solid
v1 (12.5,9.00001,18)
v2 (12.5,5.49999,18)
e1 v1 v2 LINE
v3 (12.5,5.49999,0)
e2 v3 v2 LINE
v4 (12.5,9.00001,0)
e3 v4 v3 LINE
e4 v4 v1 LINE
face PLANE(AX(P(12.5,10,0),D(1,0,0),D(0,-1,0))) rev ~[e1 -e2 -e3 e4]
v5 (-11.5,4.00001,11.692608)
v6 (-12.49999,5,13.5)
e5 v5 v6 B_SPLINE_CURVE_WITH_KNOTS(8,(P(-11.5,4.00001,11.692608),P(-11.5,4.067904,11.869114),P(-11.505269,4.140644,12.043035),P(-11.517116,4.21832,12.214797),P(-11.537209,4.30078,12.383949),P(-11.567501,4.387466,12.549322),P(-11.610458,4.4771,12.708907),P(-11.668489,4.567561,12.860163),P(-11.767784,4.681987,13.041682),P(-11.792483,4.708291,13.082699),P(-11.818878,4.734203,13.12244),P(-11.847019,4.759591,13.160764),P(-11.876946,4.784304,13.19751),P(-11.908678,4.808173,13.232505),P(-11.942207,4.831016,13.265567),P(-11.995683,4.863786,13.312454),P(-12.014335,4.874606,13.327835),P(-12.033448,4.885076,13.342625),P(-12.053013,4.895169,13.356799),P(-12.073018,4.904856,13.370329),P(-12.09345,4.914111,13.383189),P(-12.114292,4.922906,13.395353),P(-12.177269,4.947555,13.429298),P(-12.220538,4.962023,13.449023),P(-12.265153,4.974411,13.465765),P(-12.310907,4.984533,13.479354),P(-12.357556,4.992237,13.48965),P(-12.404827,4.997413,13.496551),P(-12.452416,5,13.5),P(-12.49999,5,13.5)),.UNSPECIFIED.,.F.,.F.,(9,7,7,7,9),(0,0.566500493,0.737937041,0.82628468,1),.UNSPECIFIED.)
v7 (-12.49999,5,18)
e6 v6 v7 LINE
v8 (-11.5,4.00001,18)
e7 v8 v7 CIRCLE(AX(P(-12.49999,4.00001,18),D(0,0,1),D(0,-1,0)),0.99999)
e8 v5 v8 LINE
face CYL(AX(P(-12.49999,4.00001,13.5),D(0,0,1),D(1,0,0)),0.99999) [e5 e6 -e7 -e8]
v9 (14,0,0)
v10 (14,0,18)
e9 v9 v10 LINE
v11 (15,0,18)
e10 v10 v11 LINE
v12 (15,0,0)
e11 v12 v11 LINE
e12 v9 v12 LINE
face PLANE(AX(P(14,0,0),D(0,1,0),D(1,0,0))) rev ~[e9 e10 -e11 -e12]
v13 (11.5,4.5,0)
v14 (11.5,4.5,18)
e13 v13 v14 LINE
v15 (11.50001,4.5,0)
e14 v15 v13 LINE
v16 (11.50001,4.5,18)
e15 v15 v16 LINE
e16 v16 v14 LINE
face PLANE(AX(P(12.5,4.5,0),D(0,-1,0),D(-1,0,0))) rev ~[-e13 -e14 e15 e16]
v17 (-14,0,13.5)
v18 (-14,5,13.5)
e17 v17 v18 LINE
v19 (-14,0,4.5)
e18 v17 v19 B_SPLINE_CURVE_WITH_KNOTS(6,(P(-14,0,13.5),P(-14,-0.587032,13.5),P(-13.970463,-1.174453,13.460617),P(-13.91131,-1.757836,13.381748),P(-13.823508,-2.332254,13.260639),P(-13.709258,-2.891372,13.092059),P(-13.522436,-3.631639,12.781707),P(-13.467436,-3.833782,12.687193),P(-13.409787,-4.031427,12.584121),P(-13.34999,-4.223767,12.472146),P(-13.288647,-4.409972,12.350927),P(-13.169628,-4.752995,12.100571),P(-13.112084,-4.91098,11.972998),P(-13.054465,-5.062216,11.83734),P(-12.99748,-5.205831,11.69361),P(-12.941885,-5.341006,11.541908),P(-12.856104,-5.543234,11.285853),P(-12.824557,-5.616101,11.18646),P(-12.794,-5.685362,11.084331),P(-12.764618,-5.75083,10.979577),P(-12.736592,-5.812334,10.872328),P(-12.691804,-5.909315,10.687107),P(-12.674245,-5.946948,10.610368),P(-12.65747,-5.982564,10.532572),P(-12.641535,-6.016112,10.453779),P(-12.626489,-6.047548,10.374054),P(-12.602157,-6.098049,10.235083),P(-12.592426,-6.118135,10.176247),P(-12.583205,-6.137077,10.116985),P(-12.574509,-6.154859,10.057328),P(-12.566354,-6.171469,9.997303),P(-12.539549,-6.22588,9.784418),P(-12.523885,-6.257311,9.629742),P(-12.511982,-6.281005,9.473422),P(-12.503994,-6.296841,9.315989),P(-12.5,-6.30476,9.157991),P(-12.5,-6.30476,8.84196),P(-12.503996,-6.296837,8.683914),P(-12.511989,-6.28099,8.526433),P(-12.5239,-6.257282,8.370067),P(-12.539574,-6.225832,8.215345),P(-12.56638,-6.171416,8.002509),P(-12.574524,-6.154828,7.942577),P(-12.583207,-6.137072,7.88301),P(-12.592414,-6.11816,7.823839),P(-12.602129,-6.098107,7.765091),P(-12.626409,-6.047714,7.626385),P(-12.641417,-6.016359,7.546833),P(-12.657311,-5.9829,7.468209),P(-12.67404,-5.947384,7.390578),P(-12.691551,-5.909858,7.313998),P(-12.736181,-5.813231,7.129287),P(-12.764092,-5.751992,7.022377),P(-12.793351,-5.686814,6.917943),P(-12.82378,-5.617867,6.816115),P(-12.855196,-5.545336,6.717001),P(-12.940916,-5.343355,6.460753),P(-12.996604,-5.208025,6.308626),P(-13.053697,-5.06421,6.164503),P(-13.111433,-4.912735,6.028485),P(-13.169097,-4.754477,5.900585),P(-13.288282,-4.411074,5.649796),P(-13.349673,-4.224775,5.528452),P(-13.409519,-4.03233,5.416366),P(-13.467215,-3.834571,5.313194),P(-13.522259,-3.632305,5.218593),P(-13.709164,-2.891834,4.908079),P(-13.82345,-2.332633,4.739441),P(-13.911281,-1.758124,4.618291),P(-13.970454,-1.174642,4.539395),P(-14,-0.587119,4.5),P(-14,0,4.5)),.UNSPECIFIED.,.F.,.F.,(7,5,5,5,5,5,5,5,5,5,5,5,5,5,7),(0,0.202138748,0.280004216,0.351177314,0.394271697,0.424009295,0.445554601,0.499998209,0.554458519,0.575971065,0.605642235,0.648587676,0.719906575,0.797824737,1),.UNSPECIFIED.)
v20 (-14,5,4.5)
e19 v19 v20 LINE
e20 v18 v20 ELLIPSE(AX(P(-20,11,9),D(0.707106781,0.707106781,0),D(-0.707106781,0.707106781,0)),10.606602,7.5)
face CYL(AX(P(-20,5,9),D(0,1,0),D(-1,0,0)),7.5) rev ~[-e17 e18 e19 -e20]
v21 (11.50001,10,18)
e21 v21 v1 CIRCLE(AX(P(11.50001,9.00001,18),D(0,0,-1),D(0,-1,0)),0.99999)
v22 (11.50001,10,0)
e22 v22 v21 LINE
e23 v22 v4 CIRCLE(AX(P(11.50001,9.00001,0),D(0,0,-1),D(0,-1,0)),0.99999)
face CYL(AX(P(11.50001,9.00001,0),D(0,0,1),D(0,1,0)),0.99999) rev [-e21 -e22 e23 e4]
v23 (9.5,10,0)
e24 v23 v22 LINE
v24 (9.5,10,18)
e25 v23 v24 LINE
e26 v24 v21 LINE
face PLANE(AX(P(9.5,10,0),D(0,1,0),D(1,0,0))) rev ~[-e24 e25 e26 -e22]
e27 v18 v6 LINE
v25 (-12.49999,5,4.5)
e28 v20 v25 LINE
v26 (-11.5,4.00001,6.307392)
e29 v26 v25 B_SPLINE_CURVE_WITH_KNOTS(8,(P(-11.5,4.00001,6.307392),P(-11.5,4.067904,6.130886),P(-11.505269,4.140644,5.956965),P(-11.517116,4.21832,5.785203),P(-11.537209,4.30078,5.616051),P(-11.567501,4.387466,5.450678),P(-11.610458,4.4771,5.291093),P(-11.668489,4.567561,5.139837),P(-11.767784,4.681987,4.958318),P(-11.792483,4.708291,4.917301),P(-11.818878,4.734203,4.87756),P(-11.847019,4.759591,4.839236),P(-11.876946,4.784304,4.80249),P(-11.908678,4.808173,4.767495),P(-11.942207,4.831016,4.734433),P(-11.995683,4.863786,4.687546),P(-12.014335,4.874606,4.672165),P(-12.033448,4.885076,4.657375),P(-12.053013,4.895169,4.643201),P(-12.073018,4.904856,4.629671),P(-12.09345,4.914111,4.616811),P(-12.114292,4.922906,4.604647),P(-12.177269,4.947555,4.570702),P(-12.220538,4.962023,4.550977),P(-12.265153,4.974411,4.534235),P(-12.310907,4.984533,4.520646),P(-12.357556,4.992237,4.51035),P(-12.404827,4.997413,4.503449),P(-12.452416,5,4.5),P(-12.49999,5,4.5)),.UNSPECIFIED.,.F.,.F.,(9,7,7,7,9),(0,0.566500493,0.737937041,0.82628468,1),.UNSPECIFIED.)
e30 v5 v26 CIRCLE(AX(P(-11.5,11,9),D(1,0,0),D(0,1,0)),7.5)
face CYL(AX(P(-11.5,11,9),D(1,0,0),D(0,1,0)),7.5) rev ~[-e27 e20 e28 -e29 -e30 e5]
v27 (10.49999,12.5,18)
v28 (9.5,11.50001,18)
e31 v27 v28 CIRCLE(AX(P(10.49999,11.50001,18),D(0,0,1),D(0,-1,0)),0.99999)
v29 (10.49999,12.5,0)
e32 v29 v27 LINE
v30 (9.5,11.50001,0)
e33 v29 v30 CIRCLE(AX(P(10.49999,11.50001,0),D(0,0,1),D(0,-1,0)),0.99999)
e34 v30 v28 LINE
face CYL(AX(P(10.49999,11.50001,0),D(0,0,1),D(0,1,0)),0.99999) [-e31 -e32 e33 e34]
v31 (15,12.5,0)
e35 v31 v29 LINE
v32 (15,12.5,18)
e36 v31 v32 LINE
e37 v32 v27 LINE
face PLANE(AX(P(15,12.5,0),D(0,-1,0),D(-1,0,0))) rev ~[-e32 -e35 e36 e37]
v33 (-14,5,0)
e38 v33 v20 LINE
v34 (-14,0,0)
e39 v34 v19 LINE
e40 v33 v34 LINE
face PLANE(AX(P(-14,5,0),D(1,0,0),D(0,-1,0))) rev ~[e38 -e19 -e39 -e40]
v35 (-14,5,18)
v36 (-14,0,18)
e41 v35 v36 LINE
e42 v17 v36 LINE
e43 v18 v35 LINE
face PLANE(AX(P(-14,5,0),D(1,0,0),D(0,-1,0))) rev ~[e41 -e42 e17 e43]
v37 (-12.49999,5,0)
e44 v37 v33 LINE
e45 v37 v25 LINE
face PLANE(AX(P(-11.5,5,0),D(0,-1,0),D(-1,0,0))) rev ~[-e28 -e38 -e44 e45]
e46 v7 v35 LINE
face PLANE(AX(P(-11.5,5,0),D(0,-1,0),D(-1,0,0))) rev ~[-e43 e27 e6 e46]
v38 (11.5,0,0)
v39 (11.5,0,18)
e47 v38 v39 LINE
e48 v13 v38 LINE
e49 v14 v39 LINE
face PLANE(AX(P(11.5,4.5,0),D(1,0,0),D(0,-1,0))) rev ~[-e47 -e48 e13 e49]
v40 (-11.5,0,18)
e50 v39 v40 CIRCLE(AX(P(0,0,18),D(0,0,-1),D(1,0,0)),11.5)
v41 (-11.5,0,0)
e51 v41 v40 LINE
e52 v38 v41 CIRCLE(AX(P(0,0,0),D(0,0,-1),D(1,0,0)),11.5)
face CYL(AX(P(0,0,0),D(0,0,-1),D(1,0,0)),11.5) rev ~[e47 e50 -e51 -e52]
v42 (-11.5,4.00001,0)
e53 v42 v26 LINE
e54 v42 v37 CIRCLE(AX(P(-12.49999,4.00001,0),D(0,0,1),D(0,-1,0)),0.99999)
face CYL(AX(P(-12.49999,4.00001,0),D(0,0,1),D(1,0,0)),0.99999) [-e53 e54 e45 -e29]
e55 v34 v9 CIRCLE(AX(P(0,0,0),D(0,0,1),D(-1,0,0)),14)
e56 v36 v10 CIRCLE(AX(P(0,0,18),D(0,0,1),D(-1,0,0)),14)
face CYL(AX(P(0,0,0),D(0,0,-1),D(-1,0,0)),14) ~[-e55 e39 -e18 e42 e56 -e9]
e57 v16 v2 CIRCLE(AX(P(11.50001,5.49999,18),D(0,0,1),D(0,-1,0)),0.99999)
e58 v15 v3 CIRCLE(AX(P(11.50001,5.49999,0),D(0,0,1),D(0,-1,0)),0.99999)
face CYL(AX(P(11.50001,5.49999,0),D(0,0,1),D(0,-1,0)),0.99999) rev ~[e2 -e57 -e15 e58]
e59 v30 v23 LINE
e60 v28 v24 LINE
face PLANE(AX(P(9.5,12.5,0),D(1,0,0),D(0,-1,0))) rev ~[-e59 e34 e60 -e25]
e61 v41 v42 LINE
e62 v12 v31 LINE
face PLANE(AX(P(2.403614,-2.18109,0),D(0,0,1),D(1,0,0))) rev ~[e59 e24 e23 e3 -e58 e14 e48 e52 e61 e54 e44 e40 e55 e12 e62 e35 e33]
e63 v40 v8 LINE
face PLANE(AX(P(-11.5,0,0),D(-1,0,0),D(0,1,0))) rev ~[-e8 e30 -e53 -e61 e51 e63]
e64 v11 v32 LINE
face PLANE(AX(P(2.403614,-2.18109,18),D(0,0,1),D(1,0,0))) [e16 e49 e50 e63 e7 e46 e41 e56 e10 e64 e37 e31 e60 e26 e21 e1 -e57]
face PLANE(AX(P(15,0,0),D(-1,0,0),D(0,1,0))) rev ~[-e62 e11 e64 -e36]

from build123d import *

# Parameters (mm, degrees)
F1_DEPTH = 18
F2_R     = 7.5
F3_DEPTH = 19.001
F4_R     = 7.5
F5_DEPTH = 25
F6_R     = 0.99999


# Not quite as in the source:
# - a fillet or chamfer is up to 0.001 mm smaller than in the source, because OpenCascade refuses the exact size


with BuildPart() as f1:
    # F0 (on Top) → F1 (new body)
    with BuildSketch(Plane.XY):
        with BuildLine():
            ThreePointArc((11.5, 0), (0, -11.5), (-11.5, 0))
            Line((-11.5, 0), (-11.5, 5))
            Line((-11.5, 5), (-14, 5))
            Line((-14, 5), (-14, 0))
            ThreePointArc((-14, 0), (0, -14), (14, 0))
            Line((14, 0), (15, 0))
            Line((15, 0), (15, 12.5))
            Line((15, 12.5), (9.5, 12.5))
            Line((9.5, 12.5), (9.5, 10))
            Line((9.5, 10), (12.5, 10))
            Line((12.5, 10), (12.5, 4.5))
            Line((12.5, 4.5), (11.5, 4.5))
            Line((11.5, 4.5), (11.5, 0))
        make_face()
    extrude(amount=F1_DEPTH)

    # F2 (on face) → F3 (cut, through all)
    with BuildSketch(Plane(origin=(0, 5, 0), x_dir=(-1, 0, 0), z_dir=(0, 1, 0))):
        with Locations((20, 9)):
            Circle(F2_R)
    extrude(amount=-F3_DEPTH, mode=Mode.SUBTRACT)

    # F4 (on face) → F5 (cut)
    with BuildSketch(Plane.YZ.offset(-11.5)):
        with Locations((11, 9)):
            Circle(F4_R)
    extrude(amount=-F5_DEPTH, mode=Mode.SUBTRACT)

    # F6 (radius 1 in the source; OpenCascade refuses exactly that, so slightly less here)
    f6_edges = [f1.edges().sort_by_distance(p)[0] for p in [
        (-11.5, 5, 15.75),
        (-11.5, 5, 2.25),
        (12.5, 4.5, 9),
        (12.5, 10, 9),
        (9.5, 12.5, 9),
    ]]
    fillet(f6_edges, radius=F6_R)


solid = f1.part
